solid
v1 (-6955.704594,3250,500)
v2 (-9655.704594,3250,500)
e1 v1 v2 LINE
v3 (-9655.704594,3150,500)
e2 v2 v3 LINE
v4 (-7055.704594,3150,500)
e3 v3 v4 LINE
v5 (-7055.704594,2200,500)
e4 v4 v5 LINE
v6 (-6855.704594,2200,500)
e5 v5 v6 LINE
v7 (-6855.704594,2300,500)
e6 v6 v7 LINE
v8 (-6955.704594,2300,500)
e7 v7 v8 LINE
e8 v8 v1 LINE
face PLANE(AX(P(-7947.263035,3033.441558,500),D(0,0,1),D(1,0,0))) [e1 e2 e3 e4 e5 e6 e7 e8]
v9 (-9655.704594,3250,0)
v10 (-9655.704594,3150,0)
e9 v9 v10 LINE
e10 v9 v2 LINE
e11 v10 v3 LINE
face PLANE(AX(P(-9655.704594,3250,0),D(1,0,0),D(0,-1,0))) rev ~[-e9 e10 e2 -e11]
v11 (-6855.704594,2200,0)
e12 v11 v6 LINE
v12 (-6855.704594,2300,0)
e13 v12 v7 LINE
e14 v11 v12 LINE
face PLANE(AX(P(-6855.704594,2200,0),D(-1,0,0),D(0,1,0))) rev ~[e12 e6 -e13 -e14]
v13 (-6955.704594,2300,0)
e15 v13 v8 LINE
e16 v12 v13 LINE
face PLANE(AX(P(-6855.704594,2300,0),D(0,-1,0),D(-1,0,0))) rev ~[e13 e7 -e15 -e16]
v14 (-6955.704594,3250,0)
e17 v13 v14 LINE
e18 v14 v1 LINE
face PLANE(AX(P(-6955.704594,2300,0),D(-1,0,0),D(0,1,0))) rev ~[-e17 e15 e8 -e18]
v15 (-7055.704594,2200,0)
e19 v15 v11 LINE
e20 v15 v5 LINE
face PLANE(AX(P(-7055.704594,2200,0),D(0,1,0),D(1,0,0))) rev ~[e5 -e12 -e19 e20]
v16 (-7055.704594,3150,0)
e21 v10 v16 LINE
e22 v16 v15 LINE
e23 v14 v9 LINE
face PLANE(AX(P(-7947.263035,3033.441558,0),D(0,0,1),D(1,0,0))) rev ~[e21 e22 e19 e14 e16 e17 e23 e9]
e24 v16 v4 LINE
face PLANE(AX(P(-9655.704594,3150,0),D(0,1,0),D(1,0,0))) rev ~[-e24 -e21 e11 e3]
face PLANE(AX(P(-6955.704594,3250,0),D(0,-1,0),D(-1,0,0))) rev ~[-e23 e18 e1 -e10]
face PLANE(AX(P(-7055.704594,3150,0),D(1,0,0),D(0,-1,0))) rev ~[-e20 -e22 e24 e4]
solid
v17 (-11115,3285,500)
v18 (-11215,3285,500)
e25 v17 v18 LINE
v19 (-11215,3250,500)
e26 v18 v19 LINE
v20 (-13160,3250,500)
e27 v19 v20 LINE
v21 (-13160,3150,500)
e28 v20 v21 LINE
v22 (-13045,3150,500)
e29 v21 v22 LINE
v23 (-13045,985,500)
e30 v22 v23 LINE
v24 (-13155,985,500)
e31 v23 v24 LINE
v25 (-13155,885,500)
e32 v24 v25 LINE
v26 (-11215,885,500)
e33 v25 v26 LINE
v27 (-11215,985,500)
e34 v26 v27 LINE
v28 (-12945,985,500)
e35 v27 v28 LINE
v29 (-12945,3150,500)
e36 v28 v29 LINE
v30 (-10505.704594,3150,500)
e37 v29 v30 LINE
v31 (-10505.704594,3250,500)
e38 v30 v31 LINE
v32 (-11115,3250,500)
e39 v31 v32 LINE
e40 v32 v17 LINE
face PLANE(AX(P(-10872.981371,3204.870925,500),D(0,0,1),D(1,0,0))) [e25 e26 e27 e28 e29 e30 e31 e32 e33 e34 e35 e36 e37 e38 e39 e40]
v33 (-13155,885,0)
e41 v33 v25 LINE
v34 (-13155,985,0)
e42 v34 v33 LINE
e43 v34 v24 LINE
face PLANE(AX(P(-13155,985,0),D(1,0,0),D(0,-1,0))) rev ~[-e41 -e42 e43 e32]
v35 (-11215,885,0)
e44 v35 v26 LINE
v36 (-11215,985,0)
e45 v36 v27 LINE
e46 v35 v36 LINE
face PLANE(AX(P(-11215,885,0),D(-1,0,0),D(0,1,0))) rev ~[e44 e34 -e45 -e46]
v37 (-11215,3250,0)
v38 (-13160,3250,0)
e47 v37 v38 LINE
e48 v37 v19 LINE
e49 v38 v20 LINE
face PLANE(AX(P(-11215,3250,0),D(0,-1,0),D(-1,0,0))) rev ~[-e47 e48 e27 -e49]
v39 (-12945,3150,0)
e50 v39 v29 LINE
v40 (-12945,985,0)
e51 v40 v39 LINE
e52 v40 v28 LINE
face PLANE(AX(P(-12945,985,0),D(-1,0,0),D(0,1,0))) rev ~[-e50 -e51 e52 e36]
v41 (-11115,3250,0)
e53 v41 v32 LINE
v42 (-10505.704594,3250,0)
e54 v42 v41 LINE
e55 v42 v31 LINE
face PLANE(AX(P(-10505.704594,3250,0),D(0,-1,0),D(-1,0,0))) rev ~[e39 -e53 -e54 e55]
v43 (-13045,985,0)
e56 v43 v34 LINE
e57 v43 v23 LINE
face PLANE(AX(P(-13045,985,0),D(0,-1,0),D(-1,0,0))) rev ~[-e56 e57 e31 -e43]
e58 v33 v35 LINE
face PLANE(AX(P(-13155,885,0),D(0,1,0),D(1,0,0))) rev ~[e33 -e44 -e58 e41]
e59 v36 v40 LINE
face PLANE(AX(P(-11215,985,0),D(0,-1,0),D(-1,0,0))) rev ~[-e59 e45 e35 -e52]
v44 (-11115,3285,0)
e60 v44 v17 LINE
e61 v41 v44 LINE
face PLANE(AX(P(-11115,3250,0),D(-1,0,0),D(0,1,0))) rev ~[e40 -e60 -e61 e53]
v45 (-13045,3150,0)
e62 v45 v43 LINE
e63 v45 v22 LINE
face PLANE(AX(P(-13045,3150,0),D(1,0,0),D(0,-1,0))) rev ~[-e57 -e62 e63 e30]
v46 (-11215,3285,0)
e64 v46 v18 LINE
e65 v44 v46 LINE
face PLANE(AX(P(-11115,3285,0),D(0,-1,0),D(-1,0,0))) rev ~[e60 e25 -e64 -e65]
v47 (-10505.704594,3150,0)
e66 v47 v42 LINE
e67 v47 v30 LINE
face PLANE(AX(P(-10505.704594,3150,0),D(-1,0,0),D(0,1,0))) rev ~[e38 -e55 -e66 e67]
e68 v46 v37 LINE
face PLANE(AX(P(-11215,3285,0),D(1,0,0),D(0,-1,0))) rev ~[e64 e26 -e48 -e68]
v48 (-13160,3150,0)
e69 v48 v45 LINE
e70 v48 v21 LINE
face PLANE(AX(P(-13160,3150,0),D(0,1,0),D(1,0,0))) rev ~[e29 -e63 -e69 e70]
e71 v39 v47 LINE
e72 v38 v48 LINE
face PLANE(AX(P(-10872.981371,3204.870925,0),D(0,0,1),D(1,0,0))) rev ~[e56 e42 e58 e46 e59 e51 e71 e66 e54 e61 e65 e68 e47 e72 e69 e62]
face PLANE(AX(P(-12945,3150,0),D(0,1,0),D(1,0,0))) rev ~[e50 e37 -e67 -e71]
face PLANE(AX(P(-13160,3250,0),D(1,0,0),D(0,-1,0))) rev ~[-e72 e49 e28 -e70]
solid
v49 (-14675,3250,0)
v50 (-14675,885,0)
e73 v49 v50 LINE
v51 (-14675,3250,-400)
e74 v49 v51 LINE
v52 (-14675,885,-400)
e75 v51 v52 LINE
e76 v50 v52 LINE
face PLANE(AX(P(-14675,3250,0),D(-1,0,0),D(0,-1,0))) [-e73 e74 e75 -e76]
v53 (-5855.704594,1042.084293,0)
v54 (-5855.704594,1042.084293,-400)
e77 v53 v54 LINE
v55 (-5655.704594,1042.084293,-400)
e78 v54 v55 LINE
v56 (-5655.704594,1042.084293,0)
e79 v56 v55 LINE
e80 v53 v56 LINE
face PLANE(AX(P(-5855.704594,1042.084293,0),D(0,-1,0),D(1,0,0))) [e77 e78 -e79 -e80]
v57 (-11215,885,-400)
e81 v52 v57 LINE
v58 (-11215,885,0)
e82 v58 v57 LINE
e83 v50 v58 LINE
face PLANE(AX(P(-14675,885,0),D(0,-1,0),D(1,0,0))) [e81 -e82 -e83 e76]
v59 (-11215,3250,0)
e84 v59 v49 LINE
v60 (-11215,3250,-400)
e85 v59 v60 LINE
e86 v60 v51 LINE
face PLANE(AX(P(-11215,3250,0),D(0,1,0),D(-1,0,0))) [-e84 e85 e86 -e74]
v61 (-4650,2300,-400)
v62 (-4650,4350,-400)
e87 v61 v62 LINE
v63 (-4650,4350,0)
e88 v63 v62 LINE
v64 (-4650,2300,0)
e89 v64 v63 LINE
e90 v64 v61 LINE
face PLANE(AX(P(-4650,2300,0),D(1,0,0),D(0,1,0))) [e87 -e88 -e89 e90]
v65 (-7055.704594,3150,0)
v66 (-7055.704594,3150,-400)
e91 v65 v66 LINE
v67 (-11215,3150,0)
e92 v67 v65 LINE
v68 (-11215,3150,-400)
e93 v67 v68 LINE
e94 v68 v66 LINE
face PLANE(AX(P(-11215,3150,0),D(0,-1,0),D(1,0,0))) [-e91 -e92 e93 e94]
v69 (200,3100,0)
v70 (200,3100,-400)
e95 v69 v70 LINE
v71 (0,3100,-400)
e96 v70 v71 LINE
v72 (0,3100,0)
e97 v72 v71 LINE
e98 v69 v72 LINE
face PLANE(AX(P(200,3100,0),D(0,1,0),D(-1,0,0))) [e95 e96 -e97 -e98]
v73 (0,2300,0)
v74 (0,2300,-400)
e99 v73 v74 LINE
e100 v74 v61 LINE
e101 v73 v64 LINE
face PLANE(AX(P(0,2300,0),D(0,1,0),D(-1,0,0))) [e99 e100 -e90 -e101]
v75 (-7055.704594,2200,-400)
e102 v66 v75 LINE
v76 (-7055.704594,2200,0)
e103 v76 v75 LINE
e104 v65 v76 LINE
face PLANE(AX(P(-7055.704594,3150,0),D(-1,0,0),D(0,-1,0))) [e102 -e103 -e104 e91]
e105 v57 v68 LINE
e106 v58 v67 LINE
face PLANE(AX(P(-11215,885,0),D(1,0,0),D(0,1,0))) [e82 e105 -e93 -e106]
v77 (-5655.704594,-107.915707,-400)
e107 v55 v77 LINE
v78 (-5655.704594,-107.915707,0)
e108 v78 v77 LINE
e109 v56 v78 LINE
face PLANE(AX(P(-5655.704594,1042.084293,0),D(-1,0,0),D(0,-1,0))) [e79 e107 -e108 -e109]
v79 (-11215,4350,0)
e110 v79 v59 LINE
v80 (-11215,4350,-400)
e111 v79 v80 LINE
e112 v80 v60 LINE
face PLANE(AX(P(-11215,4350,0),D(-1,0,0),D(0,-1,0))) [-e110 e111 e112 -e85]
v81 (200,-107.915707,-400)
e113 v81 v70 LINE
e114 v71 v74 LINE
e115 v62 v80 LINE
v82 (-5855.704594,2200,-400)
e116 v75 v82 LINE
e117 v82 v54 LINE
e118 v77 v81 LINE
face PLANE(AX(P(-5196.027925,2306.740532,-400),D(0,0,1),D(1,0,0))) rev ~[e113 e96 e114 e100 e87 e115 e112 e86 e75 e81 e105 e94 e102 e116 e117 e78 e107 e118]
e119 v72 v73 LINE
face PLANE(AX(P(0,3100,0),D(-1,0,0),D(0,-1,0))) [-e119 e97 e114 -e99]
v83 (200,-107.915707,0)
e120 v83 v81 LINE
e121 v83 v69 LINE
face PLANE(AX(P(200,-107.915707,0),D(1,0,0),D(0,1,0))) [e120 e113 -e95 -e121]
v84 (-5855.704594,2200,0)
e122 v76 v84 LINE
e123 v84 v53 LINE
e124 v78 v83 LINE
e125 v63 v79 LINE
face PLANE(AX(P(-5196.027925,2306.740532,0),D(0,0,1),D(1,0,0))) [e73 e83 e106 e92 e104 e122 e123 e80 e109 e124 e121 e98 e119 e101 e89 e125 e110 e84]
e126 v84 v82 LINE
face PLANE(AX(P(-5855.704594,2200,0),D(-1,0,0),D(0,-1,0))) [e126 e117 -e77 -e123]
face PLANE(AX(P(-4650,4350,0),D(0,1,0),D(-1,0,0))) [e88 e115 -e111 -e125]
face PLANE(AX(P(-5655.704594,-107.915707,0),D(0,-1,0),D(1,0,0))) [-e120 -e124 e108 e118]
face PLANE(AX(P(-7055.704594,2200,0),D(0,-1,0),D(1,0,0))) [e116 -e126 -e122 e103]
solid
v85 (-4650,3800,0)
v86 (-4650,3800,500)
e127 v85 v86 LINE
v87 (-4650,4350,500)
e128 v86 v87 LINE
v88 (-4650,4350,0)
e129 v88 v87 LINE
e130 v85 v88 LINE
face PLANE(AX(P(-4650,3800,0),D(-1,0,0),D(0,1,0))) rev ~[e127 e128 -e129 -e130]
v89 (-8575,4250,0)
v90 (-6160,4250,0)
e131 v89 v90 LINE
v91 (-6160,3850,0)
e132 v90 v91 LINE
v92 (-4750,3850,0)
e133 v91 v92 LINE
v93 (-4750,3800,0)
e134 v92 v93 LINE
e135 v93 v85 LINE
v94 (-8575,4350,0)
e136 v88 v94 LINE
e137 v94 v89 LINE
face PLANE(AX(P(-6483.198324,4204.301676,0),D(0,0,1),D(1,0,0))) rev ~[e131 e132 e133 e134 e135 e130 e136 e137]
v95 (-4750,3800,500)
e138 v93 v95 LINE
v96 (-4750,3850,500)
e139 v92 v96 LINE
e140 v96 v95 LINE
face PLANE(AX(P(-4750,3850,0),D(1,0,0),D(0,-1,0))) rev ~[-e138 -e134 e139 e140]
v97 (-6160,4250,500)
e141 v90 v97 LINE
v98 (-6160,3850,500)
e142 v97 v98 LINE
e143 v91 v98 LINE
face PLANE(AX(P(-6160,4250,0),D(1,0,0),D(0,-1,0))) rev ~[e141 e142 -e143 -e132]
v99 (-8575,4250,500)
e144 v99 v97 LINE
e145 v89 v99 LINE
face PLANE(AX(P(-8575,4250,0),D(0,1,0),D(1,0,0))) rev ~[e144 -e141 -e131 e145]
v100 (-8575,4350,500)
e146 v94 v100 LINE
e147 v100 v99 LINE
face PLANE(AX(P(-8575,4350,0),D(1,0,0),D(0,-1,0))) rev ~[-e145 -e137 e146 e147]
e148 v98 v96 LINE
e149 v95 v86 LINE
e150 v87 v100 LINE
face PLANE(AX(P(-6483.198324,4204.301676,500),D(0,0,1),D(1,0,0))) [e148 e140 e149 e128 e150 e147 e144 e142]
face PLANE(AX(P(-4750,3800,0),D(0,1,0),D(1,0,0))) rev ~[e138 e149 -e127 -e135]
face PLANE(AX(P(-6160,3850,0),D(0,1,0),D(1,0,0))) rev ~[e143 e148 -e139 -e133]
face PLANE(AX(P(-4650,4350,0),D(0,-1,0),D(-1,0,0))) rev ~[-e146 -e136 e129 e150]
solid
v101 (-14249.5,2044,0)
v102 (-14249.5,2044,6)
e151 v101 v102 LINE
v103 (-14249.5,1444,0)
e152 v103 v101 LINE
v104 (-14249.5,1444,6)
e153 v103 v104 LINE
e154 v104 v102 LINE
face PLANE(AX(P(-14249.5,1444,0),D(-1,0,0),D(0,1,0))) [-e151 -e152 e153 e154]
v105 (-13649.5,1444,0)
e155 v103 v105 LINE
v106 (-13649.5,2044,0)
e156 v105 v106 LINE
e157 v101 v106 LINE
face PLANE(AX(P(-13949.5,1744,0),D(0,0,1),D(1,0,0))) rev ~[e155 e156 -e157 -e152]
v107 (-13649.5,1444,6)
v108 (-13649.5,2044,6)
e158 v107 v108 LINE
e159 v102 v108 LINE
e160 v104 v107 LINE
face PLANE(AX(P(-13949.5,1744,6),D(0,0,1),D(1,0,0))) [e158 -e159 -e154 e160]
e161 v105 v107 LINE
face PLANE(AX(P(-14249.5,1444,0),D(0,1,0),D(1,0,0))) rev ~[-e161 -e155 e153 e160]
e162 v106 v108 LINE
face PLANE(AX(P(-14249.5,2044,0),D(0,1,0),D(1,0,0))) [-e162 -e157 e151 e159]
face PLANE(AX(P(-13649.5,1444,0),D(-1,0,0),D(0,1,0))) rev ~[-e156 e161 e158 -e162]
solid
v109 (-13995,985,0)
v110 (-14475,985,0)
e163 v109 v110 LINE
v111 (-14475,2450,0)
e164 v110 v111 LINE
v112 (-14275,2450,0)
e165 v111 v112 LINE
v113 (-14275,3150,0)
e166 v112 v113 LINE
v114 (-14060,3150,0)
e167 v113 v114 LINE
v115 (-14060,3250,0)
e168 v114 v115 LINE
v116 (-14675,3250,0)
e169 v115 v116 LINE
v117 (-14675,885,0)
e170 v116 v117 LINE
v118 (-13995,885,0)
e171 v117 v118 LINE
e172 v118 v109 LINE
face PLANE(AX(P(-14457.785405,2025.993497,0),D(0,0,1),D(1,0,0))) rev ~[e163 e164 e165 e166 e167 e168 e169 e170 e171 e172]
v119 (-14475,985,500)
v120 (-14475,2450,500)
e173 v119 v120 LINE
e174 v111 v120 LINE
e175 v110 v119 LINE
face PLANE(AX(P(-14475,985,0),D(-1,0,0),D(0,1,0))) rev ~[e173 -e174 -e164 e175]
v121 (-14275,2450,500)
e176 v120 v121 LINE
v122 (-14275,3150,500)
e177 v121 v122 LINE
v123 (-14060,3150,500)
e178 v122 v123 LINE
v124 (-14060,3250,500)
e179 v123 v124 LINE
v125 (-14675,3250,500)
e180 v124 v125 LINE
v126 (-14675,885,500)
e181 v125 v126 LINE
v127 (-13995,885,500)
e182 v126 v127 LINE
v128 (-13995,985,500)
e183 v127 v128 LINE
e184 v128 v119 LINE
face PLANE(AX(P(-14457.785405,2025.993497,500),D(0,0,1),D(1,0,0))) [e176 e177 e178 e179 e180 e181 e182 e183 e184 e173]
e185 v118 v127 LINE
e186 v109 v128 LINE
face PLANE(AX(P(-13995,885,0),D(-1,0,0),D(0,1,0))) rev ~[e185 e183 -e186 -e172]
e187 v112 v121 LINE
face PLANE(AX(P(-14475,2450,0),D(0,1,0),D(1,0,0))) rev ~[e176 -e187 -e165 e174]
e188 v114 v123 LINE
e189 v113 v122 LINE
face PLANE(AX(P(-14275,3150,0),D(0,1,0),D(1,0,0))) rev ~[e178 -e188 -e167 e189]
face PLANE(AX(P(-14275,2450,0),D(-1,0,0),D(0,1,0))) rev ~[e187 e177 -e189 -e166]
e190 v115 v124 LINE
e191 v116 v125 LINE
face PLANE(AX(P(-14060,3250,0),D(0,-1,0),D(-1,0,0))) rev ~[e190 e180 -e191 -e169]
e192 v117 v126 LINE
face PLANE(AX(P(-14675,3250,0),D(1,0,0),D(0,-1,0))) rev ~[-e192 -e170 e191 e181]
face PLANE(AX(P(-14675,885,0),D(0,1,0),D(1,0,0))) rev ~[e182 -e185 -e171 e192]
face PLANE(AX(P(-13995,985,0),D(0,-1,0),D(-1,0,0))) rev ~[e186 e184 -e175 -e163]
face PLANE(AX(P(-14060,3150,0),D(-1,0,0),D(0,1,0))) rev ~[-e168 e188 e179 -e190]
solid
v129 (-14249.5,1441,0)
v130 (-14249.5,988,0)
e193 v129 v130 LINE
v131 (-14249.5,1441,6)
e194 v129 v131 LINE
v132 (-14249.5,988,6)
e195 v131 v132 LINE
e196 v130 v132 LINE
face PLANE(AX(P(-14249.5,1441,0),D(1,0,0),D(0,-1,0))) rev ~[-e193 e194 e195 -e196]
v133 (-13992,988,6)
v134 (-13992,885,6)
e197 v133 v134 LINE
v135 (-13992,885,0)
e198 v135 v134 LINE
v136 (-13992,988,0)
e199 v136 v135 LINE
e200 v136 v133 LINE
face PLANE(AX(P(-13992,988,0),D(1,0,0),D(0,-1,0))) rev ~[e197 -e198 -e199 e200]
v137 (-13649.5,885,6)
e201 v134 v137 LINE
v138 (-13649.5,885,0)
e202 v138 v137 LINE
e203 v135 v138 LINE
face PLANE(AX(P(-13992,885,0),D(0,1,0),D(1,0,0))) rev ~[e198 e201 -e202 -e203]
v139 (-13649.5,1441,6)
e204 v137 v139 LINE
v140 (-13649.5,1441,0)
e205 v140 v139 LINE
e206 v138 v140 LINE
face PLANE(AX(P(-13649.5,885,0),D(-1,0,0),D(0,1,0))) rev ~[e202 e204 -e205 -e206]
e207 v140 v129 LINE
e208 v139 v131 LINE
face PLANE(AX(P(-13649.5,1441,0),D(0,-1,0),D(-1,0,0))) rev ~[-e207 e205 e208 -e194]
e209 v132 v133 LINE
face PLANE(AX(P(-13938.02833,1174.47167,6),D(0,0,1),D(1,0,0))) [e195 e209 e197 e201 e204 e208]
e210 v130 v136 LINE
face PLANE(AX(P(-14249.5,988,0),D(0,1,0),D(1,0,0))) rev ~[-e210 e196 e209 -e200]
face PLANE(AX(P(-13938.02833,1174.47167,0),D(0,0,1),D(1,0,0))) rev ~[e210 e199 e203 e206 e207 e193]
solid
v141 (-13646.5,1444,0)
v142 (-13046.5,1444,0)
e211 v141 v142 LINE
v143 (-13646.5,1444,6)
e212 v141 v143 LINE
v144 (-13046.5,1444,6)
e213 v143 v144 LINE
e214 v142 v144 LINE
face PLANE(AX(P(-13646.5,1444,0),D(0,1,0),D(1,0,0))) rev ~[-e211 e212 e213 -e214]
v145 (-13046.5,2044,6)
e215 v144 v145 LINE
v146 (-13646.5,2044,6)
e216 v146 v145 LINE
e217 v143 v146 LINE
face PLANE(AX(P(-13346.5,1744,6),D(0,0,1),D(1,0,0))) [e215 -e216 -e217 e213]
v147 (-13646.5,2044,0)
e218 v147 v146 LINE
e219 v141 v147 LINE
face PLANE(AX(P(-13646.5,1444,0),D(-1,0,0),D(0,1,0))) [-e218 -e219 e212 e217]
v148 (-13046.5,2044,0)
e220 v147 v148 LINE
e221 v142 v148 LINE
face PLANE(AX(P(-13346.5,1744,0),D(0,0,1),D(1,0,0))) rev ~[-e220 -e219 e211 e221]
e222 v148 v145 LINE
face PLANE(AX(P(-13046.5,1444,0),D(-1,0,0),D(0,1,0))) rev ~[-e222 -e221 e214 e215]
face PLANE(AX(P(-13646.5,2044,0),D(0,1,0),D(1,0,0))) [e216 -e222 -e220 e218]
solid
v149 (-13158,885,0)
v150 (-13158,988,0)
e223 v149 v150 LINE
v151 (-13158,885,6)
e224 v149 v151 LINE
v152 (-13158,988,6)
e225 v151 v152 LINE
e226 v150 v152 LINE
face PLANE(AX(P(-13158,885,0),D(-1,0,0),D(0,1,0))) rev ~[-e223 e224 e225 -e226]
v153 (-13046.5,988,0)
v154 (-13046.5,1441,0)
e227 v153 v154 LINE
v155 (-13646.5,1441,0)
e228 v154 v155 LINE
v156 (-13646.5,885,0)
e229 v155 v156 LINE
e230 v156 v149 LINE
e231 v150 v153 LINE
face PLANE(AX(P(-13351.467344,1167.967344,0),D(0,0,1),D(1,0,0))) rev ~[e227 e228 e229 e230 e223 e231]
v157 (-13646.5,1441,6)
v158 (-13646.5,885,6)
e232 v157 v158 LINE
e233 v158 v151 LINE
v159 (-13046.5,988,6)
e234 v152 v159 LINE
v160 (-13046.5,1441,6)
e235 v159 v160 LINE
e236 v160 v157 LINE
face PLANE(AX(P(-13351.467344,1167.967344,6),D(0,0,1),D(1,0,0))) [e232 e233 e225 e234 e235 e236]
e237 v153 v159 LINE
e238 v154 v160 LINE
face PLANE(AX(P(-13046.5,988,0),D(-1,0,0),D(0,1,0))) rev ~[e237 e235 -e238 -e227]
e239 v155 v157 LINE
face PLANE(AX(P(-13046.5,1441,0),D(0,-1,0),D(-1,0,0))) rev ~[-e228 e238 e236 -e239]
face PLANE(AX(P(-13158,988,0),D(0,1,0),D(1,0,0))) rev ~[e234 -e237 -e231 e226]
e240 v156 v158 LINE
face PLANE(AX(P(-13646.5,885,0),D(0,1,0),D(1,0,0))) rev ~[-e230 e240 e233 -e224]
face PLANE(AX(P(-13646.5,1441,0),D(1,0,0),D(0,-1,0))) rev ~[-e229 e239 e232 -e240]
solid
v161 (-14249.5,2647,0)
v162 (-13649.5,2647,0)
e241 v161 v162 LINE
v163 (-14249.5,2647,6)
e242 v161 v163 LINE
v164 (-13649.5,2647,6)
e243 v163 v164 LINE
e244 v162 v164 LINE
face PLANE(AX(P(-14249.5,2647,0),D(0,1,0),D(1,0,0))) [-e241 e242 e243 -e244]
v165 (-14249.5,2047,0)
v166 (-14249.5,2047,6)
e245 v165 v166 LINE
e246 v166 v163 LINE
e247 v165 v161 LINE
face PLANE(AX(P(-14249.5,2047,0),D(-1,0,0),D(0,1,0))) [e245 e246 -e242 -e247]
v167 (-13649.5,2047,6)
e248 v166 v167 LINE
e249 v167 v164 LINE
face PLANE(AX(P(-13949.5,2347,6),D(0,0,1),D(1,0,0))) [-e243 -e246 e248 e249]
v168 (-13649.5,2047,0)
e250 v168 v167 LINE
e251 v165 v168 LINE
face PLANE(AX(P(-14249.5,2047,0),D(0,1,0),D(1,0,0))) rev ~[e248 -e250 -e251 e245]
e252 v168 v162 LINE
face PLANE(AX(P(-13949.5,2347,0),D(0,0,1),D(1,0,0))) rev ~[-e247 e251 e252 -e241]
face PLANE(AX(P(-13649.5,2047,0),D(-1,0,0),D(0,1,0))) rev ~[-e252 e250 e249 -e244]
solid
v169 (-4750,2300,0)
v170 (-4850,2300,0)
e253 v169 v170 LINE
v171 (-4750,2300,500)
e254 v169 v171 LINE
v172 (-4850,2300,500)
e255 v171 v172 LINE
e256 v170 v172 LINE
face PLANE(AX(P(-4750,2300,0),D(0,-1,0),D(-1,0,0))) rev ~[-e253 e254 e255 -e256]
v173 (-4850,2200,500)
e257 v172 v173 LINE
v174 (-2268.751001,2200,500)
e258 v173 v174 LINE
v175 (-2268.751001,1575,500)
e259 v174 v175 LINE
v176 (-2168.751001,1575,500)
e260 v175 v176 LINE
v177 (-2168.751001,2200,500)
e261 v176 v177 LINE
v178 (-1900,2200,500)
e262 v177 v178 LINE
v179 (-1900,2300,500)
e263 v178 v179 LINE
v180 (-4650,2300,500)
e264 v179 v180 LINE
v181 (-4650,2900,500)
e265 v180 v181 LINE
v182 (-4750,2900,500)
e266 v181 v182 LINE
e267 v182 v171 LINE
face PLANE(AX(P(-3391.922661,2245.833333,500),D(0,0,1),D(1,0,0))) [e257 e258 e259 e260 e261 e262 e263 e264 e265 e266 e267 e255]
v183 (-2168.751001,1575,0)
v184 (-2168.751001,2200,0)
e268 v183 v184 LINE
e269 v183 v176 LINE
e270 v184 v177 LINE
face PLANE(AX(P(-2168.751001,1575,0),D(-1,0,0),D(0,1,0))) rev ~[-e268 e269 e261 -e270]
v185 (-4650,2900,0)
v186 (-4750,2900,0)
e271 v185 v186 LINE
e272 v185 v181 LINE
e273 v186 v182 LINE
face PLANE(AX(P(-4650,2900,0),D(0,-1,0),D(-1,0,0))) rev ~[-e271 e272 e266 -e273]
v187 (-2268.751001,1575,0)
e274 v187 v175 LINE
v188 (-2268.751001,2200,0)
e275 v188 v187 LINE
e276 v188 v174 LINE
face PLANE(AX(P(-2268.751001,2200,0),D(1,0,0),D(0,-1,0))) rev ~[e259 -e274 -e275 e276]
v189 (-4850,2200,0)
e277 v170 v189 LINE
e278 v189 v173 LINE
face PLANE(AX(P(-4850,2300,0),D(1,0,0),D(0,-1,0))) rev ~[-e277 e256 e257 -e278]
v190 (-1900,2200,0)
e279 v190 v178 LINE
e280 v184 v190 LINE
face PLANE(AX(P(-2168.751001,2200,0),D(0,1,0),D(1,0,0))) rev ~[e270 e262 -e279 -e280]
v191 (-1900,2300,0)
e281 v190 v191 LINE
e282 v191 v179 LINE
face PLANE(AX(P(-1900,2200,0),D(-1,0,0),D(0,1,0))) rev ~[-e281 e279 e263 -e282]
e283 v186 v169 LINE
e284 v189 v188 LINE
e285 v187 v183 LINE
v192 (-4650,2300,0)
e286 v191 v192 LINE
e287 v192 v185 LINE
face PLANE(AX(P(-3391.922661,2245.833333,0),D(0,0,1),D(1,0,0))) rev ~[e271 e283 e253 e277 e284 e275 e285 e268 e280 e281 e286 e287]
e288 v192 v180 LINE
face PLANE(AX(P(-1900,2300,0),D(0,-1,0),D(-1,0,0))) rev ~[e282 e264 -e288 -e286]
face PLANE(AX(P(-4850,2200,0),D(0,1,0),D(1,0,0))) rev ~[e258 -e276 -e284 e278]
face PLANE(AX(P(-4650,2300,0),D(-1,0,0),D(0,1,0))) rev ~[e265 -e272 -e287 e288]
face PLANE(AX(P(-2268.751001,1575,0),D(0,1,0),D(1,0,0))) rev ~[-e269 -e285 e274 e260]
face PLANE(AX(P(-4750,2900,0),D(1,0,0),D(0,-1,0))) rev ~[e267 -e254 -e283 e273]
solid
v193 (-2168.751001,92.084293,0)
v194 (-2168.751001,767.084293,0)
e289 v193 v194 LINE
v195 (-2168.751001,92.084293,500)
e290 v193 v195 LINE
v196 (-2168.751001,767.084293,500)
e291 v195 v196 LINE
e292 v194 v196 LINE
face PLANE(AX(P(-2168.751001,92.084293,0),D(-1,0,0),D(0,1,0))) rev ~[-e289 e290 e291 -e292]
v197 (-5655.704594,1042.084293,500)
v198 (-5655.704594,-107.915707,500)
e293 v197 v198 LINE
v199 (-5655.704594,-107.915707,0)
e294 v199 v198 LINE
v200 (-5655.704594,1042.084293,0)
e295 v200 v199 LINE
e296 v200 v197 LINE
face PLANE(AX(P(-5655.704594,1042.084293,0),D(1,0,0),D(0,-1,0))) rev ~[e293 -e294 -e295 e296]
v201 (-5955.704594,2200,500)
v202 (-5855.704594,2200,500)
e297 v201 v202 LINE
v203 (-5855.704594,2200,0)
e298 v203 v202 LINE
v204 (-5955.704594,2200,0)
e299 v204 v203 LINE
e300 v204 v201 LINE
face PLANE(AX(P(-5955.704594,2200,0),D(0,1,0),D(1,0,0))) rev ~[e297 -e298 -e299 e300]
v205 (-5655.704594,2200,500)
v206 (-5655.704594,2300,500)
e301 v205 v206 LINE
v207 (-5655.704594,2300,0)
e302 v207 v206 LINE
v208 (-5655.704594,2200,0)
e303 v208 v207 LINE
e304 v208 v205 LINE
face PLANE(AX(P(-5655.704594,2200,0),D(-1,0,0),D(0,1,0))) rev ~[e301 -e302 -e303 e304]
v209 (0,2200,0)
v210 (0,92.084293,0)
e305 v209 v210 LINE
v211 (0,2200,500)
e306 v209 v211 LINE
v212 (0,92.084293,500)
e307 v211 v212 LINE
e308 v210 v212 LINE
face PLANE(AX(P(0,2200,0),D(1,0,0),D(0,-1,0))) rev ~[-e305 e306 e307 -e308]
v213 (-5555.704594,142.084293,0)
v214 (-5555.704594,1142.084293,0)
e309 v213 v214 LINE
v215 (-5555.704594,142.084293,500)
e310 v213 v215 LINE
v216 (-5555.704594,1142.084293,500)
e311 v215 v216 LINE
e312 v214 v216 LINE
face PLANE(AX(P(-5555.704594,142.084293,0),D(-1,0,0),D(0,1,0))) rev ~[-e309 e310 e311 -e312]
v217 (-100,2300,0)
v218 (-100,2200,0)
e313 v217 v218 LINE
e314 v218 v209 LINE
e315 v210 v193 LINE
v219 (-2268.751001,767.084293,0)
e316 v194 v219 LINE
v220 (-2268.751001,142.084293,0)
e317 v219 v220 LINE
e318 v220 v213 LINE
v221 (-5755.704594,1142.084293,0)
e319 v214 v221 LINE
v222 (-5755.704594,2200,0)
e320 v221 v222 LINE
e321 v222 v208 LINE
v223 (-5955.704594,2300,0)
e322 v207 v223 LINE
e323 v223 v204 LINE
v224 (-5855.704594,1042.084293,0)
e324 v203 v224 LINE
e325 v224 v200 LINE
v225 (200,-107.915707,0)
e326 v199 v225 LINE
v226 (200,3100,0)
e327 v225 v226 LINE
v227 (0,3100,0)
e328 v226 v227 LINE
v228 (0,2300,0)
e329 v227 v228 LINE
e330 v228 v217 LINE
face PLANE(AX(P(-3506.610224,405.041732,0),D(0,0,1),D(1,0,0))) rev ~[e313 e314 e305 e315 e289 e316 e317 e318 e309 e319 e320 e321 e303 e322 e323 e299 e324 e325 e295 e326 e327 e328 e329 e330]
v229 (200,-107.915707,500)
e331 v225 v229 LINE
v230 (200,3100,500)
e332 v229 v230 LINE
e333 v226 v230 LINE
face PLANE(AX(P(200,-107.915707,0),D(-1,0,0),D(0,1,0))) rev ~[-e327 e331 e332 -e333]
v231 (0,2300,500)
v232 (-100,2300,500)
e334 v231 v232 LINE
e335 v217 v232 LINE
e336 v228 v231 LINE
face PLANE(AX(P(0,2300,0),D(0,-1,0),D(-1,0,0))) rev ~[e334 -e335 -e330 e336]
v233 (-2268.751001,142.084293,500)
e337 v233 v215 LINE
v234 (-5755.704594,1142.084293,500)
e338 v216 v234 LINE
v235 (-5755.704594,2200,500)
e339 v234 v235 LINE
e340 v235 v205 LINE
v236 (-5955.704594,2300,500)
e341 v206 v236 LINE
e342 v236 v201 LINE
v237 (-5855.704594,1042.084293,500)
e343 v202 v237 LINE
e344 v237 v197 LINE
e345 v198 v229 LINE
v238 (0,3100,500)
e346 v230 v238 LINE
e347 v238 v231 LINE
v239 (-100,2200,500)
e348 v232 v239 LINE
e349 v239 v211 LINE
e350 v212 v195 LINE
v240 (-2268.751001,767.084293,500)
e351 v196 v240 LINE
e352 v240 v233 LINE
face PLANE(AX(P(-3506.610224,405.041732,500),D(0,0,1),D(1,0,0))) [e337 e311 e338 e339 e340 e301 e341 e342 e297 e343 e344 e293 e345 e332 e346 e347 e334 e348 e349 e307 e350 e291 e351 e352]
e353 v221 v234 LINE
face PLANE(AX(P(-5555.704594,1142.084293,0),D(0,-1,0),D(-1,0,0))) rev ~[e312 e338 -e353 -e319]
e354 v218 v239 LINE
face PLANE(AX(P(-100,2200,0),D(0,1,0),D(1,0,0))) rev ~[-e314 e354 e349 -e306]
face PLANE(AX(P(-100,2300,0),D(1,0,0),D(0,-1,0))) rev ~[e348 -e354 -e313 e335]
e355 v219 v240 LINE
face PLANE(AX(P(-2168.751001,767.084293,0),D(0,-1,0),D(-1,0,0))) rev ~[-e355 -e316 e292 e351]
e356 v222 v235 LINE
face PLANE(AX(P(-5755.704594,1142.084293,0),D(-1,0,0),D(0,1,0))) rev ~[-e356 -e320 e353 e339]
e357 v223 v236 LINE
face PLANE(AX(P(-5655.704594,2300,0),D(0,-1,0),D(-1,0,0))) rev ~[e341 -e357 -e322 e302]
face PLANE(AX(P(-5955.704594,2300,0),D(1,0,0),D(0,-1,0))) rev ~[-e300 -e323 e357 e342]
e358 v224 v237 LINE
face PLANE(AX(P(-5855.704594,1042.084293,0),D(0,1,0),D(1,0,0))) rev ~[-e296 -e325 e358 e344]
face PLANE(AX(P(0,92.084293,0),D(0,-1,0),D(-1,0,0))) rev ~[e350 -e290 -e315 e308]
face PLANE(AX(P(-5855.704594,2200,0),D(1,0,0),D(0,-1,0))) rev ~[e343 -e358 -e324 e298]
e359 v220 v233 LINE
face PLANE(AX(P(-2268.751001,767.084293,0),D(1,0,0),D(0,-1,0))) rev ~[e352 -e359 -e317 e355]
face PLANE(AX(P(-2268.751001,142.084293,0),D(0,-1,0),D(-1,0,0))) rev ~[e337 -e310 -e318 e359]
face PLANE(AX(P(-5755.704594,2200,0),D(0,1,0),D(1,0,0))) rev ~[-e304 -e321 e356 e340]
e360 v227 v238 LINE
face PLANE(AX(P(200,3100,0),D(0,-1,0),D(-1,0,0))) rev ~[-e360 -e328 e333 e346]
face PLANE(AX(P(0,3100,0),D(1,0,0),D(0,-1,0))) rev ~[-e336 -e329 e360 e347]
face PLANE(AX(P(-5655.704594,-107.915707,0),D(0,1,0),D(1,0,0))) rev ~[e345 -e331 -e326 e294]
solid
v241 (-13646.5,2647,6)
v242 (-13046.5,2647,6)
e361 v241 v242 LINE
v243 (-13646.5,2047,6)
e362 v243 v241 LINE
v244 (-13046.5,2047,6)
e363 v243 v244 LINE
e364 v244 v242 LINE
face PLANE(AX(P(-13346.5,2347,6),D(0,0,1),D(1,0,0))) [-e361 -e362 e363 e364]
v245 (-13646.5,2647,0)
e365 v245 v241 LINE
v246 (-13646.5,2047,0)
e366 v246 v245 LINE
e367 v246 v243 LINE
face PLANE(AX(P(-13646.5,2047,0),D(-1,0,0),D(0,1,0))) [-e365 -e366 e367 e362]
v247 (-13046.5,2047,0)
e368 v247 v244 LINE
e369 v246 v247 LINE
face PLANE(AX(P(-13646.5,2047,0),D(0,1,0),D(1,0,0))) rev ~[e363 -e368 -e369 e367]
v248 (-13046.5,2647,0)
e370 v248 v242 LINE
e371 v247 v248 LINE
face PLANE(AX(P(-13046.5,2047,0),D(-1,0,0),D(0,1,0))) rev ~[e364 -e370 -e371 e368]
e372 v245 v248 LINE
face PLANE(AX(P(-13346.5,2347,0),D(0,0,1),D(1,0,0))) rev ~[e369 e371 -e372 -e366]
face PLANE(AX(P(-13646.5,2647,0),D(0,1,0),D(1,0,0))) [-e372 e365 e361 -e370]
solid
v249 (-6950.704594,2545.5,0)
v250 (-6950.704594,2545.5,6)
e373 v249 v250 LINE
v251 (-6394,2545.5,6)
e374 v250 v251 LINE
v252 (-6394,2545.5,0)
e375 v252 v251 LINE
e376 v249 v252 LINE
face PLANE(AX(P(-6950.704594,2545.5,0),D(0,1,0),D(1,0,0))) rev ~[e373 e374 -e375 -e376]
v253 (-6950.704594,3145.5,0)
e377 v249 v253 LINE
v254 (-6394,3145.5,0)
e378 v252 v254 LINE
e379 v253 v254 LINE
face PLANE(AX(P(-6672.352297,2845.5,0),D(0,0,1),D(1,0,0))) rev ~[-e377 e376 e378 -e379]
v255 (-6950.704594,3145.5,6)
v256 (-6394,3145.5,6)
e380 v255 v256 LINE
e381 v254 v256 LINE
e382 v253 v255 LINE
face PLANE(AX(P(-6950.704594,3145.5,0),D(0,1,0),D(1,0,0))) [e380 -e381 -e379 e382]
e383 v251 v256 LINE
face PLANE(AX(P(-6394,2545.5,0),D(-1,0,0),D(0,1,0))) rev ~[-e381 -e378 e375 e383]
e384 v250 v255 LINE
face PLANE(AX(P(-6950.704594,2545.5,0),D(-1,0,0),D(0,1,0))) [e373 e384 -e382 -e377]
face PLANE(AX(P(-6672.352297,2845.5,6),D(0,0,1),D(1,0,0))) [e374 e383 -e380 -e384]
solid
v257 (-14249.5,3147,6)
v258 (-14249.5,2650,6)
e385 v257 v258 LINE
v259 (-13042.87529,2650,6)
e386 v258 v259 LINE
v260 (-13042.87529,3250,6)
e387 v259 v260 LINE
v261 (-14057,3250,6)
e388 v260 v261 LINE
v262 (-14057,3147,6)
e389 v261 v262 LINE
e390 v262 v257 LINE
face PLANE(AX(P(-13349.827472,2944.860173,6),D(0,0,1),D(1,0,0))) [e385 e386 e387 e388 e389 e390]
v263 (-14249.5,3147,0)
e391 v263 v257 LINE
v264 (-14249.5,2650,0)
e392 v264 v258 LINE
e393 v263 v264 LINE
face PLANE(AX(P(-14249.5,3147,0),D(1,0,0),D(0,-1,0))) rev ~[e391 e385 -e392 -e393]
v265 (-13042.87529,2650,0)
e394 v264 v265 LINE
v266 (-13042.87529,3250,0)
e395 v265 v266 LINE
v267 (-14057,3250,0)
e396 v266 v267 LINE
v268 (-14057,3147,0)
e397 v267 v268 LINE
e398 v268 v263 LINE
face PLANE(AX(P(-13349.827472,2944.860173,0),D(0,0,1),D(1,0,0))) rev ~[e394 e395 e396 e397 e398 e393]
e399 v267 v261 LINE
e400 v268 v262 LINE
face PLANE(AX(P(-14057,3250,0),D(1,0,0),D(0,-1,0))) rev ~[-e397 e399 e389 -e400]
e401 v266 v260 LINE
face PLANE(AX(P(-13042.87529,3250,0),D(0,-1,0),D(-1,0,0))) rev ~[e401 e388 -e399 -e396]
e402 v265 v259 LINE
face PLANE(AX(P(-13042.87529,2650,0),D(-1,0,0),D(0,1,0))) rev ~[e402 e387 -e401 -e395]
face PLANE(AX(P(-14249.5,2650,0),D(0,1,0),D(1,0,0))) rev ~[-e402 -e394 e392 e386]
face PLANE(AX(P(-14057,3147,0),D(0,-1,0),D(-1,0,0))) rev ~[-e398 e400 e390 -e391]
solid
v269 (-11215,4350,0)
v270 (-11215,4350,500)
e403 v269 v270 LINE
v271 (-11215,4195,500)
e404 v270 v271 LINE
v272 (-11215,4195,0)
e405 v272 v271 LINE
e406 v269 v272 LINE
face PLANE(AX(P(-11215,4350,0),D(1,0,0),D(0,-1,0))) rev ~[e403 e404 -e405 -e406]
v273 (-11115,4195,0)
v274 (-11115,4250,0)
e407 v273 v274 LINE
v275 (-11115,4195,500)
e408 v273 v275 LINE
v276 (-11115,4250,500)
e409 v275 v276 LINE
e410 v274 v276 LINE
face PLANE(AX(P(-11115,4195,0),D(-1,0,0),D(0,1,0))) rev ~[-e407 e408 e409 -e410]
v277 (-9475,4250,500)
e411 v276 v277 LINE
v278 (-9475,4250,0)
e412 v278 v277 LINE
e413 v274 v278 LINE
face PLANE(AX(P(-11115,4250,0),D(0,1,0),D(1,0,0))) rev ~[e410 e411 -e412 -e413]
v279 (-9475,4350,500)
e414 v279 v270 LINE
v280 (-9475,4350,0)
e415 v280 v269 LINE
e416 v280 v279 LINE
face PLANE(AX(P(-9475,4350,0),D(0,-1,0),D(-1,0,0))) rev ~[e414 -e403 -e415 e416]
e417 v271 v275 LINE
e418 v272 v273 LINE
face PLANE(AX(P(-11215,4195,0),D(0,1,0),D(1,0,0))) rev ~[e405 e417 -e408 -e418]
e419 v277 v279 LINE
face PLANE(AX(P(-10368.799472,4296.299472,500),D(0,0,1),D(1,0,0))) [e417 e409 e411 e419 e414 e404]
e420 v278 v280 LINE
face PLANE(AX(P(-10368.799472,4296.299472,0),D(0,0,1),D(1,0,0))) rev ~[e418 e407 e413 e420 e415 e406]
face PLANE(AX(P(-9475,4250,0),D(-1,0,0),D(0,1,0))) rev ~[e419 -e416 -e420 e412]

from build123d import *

# Parameters (mm, degrees)
F0_W     = 1730
F0_H     = 2165
F1_DEPTH = 400
F2_DEPTH = 500
F3_W     = 600
F3_H     = 600
F4_DEPTH = 6
F3_W_2   = 120.124710083
F3_H_2   = 103
F3_W_3   = 556.7045936584
F5_DEPTH = 6


with BuildPart() as f1:
    # F0 (on Top) → F1 (new body)
    with BuildSketch(Plane.XY):
        Polygon((0, 142.0842932612), (0, 2200), (-100, 2200), (-100, 2300), (-1900, 2300), (-1900, 2200), (-2168.751001358, 2200), (-2168.751001358, 1575), (-2268.751001358, 1575), (-2268.751001358, 2200), (-4650, 2200), (-4750, 2200), (-4850, 2200), (-4850, 2300), (-4750, 2300), (-4750, 2900), (-4650, 2900), (-4650, 3250), (-4650, 3800), (-4750, 3800), (-4750, 3850), (-6160, 3850), (-6160, 4250), (-8575, 4250), (-8575, 4350), (-9475, 4350), (-9475, 4250), (-11115, 4250), (-11115, 4195), (-11215, 4195), (-11215, 3285), (-11115, 3285), (-11115, 3250), (-10505.7045936584, 3250), (-10505.7045936584, 3150), (-9655.7045936584, 3150), (-9655.7045936584, 3250), (-7055.7045936584, 3250), (-6955.7045936584, 3250), (-6955.7045936584, 3150), (-6955.7045936584, 2300), (-6855.7045936584, 2300), (-6855.7045936584, 2200), (-5955.7045936584, 2200), (-5955.7045936584, 2300), (-5655.7045936584, 2300), (-5655.7045936584, 2200), (-5755.7045936584, 2200), (-5755.7045936584, 1142.0842932612), (-5555.7045936584, 1142.0842932612), (-5555.7045936584, 142.0842932612), (-2268.751001358, 142.0842932612), (-2268.751001358, 767.0842932612), (-2168.751001358, 767.0842932612), (-2168.751001358, 142.0842932612), (-2168.751001358, 92.0842932612), (0, 92.0842932612), align=None)
        Polygon((-100, 2200), (0, 2200), (0, 142.0842932612), (200, 142.0842932612), (200, 3100), (0, 3100), (0, 2300), (-100, 2300), align=None)
        Polygon((200, 142.0842932612), (0, 142.0842932612), (0, 92.0842932612), (-2168.751001358, 92.0842932612), (-2168.751001358, 142.0842932612), (-2168.751001358, 767.0842932612), (-2268.751001358, 767.0842932612), (-2268.751001358, 142.0842932612), (-5555.7045936584, 142.0842932612), (-5555.7045936584, 1142.0842932612), (-5755.7045936584, 1142.0842932612), (-5755.7045936584, 2200), (-5655.7045936584, 2200), (-5655.7045936584, 2300), (-5955.7045936584, 2300), (-5955.7045936584, 2200), (-5855.7045936584, 2200), (-5855.7045936584, 1042.0842932612), (-5655.7045936584, 1042.0842932612), (-5655.7045936584, -107.9157067388), (200, -107.9157067388), (200, 0), align=None)
        Polygon((-1900, 2200), (-1900, 2300), (-4650, 2300), (-4650, 2900), (-4750, 2900), (-4750, 2300), (-4850, 2300), (-4850, 2200), (-4750, 2200), (-4650, 2200), (-2268.751001358, 2200), (-2268.751001358, 1575), (-2168.751001358, 1575), (-2168.751001358, 2200), align=None)
        Polygon((-4750, 3800), (-4650, 3800), (-4650, 4250), (-4650, 4350), (-4750, 4350), (-8575, 4350), (-8575, 4250), (-6160, 4250), (-6160, 3850), (-4750, 3850), align=None)
        Polygon((-7055.7045936584, 2200), (-6855.7045936584, 2200), (-6855.7045936584, 2300), (-6955.7045936584, 2300), (-6955.7045936584, 3150), (-6955.7045936584, 3250), (-7055.7045936584, 3250), (-9655.7045936584, 3250), (-9655.7045936584, 3150), (-7055.7045936584, 3150), align=None)
        Polygon((-9475, 4250), (-9475, 4350), (-11115, 4350), (-11215, 4350), (-11215, 4195), (-11115, 4195), (-11115, 4250), align=None)
        Polygon((-11215, 3150), (-10505.7045936584, 3150), (-10505.7045936584, 3250), (-11115, 3250), (-11115, 3285), (-11215, 3285), (-11215, 3250), align=None)
        Polygon((-12945, 3150), (-11215, 3150), (-11215, 3250), (-12945, 3250), (-13160, 3250), (-13160, 3150), (-13045, 3150), (-13045, 985), (-12945, 985), align=None)
        with Locations((-12080, 2067.5)):
            Rectangle(F0_W, F0_H)
        Polygon((-11215, 885), (-11215, 985), (-12945, 985), (-13045, 985), (-13155, 985), (-13155, 885), align=None)
        Polygon((-13995, 885), (-13155, 885), (-13155, 985), (-13045, 985), (-13045, 3150), (-13160, 3150), (-13160, 3250), (-14060, 3250), (-14060, 3150), (-14275, 3150), (-14275, 2450), (-14475, 2450), (-14475, 985), (-13995, 985), align=None)
        Polygon((-14475, 885), (-13995, 885), (-13995, 985), (-14475, 985), (-14475, 2450), (-14275, 2450), (-14275, 3150), (-14060, 3150), (-14060, 3250), (-14675, 3250), (-14675, 985), (-14675, 885), align=None)
    extrude(amount=-F1_DEPTH)


with BuildPart() as f2:
    # F0 (on Top) → F2 (new body)
    with BuildSketch(Plane.XY):
        Polygon((-9475, 4250), (-9475, 4350), (-11115, 4350), (-11215, 4350), (-11215, 4195), (-11115, 4195), (-11115, 4250), align=None)
    extrude(amount=F2_DEPTH)


with BuildPart() as f2b:
    # F0 (on Top) → F2, piece 2 (new body)
    with BuildSketch(Plane.XY):
        Polygon((-4750, 3800), (-4650, 3800), (-4650, 4250), (-4650, 4350), (-4750, 4350), (-8575, 4350), (-8575, 4250), (-6160, 4250), (-6160, 3850), (-4750, 3850), align=None)
    extrude(amount=F2_DEPTH)


with BuildPart() as f2c:
    # F0 (on Top) → F2, piece 3 (new body)
    with BuildSketch(Plane.XY):
        Polygon((-11215, 3150), (-10505.7045936584, 3150), (-10505.7045936584, 3250), (-11115, 3250), (-11115, 3285), (-11215, 3285), (-11215, 3250), align=None)
        Polygon((-12945, 3150), (-11215, 3150), (-11215, 3250), (-12945, 3250), (-13160, 3250), (-13160, 3150), (-13045, 3150), (-13045, 985), (-12945, 985), align=None)
        Polygon((-11215, 885), (-11215, 985), (-12945, 985), (-13045, 985), (-13155, 985), (-13155, 885), align=None)
    extrude(amount=F2_DEPTH)


with BuildPart() as f2d:
    # F0 (on Top) → F2, piece 4 (new body)
    with BuildSketch(Plane.XY):
        Polygon((-14475, 885), (-13995, 885), (-13995, 985), (-14475, 985), (-14475, 2450), (-14275, 2450), (-14275, 3150), (-14060, 3150), (-14060, 3250), (-14675, 3250), (-14675, 985), (-14675, 885), align=None)
    extrude(amount=F2_DEPTH)


with BuildPart() as f2e:
    # F0 (on Top) → F2, piece 5 (new body)
    with BuildSketch(Plane.XY):
        Polygon((200, 142.0842932612), (0, 142.0842932612), (0, 92.0842932612), (-2168.751001358, 92.0842932612), (-2168.751001358, 142.0842932612), (-2168.751001358, 767.0842932612), (-2268.751001358, 767.0842932612), (-2268.751001358, 142.0842932612), (-5555.7045936584, 142.0842932612), (-5555.7045936584, 1142.0842932612), (-5755.7045936584, 1142.0842932612), (-5755.7045936584, 2200), (-5655.7045936584, 2200), (-5655.7045936584, 2300), (-5955.7045936584, 2300), (-5955.7045936584, 2200), (-5855.7045936584, 2200), (-5855.7045936584, 1042.0842932612), (-5655.7045936584, 1042.0842932612), (-5655.7045936584, -107.9157067388), (200, -107.9157067388), (200, 0), align=None)
        Polygon((-100, 2200), (0, 2200), (0, 142.0842932612), (200, 142.0842932612), (200, 3100), (0, 3100), (0, 2300), (-100, 2300), align=None)
    extrude(amount=F2_DEPTH)


with BuildPart() as f2f:
    # F0 (on Top) → F2, piece 6 (new body)
    with BuildSketch(Plane.XY):
        Polygon((-1900, 2200), (-1900, 2300), (-4650, 2300), (-4650, 2900), (-4750, 2900), (-4750, 2300), (-4850, 2300), (-4850, 2200), (-4750, 2200), (-4650, 2200), (-2268.751001358, 2200), (-2268.751001358, 1575), (-2168.751001358, 1575), (-2168.751001358, 2200), align=None)
    extrude(amount=F2_DEPTH)


with BuildPart() as f2g:
    # F0 (on Top) → F2, piece 7 (new body)
    with BuildSketch(Plane.XY):
        Polygon((-7055.7045936584, 2200), (-6855.7045936584, 2200), (-6855.7045936584, 2300), (-6955.7045936584, 2300), (-6955.7045936584, 3150), (-6955.7045936584, 3250), (-7055.7045936584, 3250), (-9655.7045936584, 3250), (-9655.7045936584, 3150), (-7055.7045936584, 3150), align=None)
    extrude(amount=F2_DEPTH)


with BuildPart() as f4:
    # F3 (on face) → F4 (new body)
    with BuildSketch(Plane.XY):
        with Locations((-13346.5, 2347)):
            Rectangle(F3_W, F3_H)
    extrude(amount=F4_DEPTH)


with BuildPart() as f4b:
    # F3 (on face) → F4, piece 2 (new body)
    with BuildSketch(Plane.XY):
        with Locations((-13949.5, 2347)):
            Rectangle(F3_W, F3_H)
    extrude(amount=F4_DEPTH)


with BuildPart() as f4c:
    # F3 (on face) → F4, piece 3 (new body)
    with BuildSketch(Plane.XY):
        Polygon((-13163, 3250), (-13646.5, 3250), (-13646.5, 2650), (-13042.875289917, 2650), (-13042.875289917, 3147), (-13163, 3147), align=None)
        Polygon((-13646.5, 2650), (-13646.5, 3250), (-14057, 3250), (-14057, 3147), (-14249.5, 3147), (-14249.5, 2650), align=None)
        with Locations((-13102.9376449585, 3198.5)):
            Rectangle(F3_W_2, F3_H_2)
    extrude(amount=F4_DEPTH)


with BuildPart() as f4d:
    # F3 (on face) → F4, piece 4 (new body)
    with BuildSketch(Plane.XY):
        Polygon((-13992, 988), (-13992, 885), (-13649.5, 885), (-13649.5, 1441), (-14249.5, 1441), (-14249.5, 988), align=None)
    extrude(amount=F4_DEPTH)


with BuildPart() as f4e:
    # F3 (on face) → F4, piece 5 (new body)
    with BuildSketch(Plane.XY):
        with Locations((-13949.5, 1744)):
            Rectangle(F3_W, F3_H)
    extrude(amount=F4_DEPTH)


with BuildPart() as f4f:
    # F3 (on face) → F4, piece 6 (new body)
    with BuildSketch(Plane.XY):
        with Locations((-13346.5, 1744)):
            Rectangle(F3_W, F3_H)
    extrude(amount=F4_DEPTH)


with BuildPart() as f4g:
    # F3 (on face) → F4, piece 7 (new body)
    with BuildSketch(Plane.XY):
        with Locations((-6672.3522968292, 2845.5)):
            Rectangle(F3_W_3, F3_H)
    extrude(amount=F4_DEPTH)


with BuildPart() as f5:
    # F3 (on face) → F5 (new body)
    with BuildSketch(Plane.XY):
        Polygon((-13646.5, 1441), (-13646.5, 885), (-13158, 885), (-13158, 988), (-13046.5, 988), (-13046.5, 1441), align=None)
    extrude(amount=F5_DEPTH)


solid = Compound([f1.part, f2.part, f2b.part, f2c.part, f2d.part, f2e.part, f2f.part, f2g.part, f4.part, f4b.part, f4c.part, f4d.part, f4e.part, f4f.part, f4g.part, f5.part])
